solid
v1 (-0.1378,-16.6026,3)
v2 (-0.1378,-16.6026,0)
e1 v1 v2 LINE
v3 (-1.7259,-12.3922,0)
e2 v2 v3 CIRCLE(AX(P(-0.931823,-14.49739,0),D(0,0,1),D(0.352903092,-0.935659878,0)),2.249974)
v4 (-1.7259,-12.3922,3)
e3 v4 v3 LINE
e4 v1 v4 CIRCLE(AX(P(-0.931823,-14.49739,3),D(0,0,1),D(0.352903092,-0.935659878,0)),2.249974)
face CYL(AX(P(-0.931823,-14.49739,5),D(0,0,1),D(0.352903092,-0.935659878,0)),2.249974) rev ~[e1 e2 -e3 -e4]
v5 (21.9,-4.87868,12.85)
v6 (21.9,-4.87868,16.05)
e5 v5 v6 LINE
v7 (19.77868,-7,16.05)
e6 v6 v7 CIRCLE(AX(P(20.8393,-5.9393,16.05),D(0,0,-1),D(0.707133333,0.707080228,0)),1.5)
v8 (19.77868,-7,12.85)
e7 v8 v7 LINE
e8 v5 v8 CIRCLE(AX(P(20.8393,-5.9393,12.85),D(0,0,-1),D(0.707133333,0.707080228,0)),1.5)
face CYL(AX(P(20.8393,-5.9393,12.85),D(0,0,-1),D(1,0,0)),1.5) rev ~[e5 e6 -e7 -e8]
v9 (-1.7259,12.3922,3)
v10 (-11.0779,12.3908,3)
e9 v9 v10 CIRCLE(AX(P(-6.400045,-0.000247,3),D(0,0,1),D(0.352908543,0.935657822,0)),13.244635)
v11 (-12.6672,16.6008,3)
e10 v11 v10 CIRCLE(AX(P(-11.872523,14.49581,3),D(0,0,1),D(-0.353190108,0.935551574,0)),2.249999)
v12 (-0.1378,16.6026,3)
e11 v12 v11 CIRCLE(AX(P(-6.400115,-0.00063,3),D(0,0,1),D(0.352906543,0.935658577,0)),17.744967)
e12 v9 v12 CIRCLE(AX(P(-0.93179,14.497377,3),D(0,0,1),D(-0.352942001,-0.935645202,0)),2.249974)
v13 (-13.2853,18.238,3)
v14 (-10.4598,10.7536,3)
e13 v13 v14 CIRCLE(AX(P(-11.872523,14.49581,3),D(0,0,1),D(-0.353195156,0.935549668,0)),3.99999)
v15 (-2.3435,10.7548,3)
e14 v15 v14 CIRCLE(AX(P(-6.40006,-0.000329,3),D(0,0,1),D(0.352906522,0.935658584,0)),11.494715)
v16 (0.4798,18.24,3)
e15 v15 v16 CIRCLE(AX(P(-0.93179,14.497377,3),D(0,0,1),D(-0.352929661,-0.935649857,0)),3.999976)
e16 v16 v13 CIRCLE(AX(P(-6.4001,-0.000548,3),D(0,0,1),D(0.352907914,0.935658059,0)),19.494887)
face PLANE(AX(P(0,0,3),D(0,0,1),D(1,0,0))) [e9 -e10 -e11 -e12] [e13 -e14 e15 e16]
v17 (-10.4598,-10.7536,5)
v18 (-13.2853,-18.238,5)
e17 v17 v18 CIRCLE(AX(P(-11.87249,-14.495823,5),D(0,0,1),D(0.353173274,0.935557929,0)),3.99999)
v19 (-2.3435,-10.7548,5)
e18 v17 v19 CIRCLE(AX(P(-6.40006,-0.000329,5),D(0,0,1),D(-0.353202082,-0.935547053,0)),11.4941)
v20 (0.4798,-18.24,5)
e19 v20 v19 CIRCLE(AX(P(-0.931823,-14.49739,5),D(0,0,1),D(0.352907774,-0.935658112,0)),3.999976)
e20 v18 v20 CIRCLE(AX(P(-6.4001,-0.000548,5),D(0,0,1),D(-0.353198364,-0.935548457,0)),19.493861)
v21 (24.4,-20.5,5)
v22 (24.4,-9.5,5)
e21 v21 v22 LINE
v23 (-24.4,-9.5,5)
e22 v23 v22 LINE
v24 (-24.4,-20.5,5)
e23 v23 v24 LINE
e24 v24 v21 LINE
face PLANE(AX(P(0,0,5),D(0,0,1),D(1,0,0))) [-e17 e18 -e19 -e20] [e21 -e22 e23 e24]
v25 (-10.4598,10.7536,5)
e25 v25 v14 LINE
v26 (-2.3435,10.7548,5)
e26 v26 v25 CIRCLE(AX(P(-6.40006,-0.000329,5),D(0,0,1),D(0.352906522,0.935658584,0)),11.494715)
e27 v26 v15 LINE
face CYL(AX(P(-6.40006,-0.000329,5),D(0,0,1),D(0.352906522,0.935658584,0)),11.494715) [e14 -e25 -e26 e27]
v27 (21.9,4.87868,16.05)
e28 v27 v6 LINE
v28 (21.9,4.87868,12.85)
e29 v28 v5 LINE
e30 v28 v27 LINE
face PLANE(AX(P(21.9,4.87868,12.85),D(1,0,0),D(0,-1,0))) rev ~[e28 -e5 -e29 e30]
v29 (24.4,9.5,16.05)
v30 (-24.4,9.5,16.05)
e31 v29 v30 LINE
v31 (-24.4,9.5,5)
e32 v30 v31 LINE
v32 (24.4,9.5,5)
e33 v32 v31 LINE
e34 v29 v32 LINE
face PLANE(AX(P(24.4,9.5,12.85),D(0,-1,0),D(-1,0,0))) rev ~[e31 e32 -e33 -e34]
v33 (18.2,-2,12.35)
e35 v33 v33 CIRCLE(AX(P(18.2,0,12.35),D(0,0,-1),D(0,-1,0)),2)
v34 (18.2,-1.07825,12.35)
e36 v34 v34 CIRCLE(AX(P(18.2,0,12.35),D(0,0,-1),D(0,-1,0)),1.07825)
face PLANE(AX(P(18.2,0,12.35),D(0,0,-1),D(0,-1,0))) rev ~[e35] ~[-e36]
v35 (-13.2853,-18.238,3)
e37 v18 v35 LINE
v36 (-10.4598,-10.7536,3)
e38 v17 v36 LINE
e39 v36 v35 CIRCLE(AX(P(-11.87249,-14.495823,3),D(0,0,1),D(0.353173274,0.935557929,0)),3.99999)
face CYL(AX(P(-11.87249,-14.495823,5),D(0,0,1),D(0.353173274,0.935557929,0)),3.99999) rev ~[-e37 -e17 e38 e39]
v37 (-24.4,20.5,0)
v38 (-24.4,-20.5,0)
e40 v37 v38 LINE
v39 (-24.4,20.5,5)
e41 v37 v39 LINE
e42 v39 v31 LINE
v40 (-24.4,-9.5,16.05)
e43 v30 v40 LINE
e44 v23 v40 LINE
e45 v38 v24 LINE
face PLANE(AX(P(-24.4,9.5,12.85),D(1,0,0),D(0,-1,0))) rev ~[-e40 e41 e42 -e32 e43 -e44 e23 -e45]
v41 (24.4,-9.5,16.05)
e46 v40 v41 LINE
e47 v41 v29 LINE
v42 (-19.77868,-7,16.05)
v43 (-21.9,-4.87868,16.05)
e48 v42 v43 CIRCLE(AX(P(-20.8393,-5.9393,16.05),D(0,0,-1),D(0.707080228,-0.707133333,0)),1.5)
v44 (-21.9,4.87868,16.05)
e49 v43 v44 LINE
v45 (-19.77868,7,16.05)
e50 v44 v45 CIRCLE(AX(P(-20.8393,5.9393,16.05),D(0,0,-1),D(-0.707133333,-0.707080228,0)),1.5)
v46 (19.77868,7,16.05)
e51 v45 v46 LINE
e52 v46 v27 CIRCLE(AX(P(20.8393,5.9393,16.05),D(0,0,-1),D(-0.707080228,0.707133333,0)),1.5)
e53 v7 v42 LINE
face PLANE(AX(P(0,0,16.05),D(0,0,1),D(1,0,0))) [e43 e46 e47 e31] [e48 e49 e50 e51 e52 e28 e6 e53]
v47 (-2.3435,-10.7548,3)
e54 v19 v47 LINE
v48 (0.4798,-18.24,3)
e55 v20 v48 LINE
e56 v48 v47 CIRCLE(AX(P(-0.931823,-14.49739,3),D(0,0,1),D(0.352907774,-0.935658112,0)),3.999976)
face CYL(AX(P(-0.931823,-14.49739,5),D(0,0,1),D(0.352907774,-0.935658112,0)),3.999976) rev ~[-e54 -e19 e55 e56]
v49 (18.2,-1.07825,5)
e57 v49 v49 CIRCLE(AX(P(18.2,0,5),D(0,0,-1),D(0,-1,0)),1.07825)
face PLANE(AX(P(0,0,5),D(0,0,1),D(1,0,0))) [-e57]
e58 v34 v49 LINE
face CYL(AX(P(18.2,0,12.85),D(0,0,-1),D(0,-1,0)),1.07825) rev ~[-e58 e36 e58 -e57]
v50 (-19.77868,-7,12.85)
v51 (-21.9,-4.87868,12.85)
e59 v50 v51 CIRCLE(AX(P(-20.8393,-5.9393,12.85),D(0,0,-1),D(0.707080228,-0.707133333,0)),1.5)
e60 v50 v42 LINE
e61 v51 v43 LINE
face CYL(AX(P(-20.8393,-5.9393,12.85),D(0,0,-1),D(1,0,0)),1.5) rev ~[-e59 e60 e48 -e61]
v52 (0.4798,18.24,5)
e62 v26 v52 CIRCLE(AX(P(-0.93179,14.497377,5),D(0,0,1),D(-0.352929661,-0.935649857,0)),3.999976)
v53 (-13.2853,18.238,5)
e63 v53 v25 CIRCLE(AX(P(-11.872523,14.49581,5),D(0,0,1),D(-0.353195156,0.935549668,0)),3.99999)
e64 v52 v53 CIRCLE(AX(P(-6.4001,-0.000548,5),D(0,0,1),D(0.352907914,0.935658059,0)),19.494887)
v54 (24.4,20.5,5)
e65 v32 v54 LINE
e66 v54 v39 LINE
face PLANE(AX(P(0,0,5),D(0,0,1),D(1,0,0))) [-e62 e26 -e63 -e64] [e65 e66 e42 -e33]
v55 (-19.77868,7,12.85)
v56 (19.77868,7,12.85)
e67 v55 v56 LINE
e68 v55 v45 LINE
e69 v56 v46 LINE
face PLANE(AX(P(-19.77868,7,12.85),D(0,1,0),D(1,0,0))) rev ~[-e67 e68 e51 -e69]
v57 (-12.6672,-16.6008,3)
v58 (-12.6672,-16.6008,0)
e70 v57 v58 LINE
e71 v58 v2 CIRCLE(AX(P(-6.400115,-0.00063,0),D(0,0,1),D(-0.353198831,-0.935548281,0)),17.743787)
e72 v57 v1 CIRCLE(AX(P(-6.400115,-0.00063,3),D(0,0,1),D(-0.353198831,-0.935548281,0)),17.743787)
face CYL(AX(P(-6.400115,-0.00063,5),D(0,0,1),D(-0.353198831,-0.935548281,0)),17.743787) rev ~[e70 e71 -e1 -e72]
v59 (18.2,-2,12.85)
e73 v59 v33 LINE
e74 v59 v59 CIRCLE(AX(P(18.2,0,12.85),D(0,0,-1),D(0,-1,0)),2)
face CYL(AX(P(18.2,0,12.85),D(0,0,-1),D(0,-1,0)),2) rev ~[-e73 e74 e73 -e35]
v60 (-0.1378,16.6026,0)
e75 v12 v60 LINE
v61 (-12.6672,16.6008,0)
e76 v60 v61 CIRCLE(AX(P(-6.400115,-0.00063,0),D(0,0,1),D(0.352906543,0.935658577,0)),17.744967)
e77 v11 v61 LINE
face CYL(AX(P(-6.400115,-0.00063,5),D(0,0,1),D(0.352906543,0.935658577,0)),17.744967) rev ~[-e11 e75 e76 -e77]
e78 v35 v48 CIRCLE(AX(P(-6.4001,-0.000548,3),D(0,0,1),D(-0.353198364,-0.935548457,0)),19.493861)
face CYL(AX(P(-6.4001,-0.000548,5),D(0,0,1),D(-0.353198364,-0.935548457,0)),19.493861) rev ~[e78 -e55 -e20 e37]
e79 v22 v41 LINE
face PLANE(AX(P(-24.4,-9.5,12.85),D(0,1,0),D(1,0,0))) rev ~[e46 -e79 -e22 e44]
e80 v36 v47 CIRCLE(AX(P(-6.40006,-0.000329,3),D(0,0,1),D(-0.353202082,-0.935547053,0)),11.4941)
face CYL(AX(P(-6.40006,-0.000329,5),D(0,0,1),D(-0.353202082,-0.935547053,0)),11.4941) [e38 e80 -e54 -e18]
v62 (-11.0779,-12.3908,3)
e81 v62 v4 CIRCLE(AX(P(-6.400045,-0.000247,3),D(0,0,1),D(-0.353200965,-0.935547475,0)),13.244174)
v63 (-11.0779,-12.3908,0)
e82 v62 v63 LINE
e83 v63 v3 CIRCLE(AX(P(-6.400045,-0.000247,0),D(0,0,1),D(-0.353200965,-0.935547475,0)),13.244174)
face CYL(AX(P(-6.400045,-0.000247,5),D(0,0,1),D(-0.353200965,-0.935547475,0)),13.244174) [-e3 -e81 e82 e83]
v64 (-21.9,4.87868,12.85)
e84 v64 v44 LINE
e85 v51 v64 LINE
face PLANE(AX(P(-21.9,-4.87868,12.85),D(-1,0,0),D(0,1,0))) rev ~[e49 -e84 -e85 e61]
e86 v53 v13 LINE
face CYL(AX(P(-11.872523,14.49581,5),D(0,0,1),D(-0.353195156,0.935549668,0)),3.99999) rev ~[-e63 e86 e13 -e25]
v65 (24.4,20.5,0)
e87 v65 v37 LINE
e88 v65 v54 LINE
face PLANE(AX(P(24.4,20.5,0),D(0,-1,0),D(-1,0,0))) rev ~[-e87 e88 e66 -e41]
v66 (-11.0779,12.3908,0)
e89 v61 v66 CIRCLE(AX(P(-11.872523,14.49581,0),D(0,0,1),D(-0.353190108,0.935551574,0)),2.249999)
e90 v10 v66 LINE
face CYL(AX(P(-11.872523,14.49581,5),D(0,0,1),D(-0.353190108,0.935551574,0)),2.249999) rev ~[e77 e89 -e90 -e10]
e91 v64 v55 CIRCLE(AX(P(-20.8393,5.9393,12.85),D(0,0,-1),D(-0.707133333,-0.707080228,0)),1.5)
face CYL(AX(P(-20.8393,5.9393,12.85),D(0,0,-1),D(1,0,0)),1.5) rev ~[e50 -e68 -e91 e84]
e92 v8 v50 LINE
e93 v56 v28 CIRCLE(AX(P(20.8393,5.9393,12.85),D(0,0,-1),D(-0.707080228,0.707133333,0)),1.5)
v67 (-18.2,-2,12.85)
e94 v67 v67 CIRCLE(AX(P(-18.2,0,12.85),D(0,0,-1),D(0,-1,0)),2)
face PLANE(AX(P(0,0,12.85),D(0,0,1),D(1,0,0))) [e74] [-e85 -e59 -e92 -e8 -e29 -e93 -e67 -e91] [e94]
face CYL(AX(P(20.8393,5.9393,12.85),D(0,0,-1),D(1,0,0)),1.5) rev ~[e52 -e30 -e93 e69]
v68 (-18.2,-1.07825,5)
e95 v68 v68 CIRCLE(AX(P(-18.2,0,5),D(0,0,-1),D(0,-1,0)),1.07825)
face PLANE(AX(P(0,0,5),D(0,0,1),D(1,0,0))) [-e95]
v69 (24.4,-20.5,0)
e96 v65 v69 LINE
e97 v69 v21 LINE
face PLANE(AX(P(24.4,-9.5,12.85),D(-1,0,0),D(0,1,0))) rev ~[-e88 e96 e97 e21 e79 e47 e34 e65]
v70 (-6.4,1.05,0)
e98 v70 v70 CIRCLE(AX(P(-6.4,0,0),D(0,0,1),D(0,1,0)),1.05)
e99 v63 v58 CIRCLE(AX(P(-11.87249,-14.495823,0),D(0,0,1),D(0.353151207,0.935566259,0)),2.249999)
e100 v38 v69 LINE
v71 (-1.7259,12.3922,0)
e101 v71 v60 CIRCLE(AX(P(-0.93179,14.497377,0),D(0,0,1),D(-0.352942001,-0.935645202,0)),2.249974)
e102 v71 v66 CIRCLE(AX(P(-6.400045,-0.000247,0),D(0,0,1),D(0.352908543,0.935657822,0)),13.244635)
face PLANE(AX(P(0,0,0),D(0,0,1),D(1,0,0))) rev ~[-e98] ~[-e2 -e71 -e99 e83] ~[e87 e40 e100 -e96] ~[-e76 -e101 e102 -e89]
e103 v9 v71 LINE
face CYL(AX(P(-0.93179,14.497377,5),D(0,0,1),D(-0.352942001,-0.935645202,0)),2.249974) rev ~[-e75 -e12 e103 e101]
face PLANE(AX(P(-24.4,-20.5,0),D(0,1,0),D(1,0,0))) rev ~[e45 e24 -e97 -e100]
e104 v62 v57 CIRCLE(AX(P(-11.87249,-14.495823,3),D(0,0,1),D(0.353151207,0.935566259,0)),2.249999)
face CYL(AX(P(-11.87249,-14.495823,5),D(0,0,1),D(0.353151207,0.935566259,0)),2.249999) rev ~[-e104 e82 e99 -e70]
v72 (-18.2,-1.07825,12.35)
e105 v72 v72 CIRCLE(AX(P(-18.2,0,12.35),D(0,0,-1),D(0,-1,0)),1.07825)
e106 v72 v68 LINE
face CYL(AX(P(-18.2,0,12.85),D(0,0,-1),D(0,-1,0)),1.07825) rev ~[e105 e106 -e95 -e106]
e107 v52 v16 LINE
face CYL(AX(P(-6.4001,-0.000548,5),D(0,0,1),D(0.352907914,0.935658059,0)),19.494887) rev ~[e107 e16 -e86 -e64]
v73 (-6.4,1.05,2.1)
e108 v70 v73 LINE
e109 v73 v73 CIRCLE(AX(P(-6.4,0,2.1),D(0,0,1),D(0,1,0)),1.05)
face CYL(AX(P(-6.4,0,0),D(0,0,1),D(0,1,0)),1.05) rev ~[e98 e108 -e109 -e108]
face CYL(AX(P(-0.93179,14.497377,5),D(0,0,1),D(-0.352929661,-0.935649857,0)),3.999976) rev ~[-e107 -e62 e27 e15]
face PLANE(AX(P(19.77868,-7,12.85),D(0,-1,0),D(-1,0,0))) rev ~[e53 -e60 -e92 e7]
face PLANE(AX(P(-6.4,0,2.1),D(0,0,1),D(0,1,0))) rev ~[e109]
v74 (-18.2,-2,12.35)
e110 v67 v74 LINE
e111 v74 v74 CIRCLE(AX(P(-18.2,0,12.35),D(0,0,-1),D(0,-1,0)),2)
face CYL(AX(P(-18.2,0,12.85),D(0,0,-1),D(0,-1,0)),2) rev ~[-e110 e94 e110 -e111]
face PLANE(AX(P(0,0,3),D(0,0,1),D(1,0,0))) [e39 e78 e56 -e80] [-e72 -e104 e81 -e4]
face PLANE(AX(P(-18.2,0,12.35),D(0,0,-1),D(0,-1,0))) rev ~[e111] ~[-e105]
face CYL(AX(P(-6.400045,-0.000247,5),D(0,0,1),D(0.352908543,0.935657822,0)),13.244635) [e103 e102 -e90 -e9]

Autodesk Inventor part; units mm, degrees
ref_plane "YZ Plane" through (0, 0, 0) normal (1, 0, 0) x (0, 1, 0)
ref_plane "XZ Plane" through (0, 0, 0) normal (0, 1, 0) x (-1, 0, 0)
ref_plane "XY Plane" through (0, 0, 0) normal (0, 0, 1) x (1, 0, 0)
sketch "Sketch1" plane through (0, 0, 0) normal (0, 0, 1) x (1, 0, 0)
  line L0 (-24.4, -9.5) -> (24.4, -9.5)
  line L1 (24.4, -9.5) -> (24.4, 9.5)
  line L2 (24.4, 9.5) -> (-24.4, 9.5)
  line L3 (-24.4, 9.5) -> (-24.4, -9.5)
  line L4 (-24.4, -9.5) -> (24.4, 9.5) construction
  line L5 (24.4, -9.5) -> (-24.4, 9.5) construction
  point P0 (0, 0)
  dimension "LENGTH" = 48.8
  dimension "WIDTH" = 19
extrude "Extrusion1" add sketch "Sketch1" along normal blind 12.85
sketch "Sketch2" plane through (0, 0, 12.85) normal (0, 0, 1) x (1, 0, 0)
  point P0 (0, 0)
  point P1 (-18.2, 0)
  point P2 (18.2, 0)
  dimension "d11" = 0
  dimension "d12" = 0
  dimension "d13" = 36.4
  dimension "d14" = 18.2
hole "Hole1" at (-18.2, 0, 12.85) at (18.2, 0, 12.85) direction (0, 0, -1) diameter 2.1565 depth 8.87 thread size "4-40 UNC" class "2B" standard "ANSI Unified Screw Threads"
sketch "Sketch3" plane through (0, 0, 12.85) normal (0, 0, 1) x (1, 0, 0)
  point P0 (0, 0)
  point P1 (0, 0)
  dimension "d22" = 0
  dimension "d23" = 0
hole "Hole2" [suppressed]
sketch "Sketch4" plane through (0, 0, 0) normal (0, 0, -1) x (-1, 0, 0)
  line L0 (5.5, 0) -> (4.5, 0) construction
  line L1 (5.5, 1.05) -> (4.5, 1.05)
  line L2 (4.5, -1.05) -> (5.5, -1.05)
  arc A0 (5.5, -1.05) -> (5.5, 1.05) centre (5.5, 0) ccw
  arc A1 (4.5, 1.05) -> (4.5, -1.05) centre (4.5, 0) ccw
  point P0 (0, 0)
  point P1 (-5, 0)
  point P2 (5, 0)
  dimension "d24" = 1
  dimension "d25" = 0
  dimension "d26" = 0
  dimension "d27" = 10
  dimension "d28" = 5
  dimension "d29" = 1.05
hole "Hole3" [suppressed]
extrude "Extrusion2" [suppressed]
sketch "Sketch5" plane through (0, 0, 0) normal (0, 0, 1) x (1, 0, 0)
  line L0 (-24.4, -20.5) -> (24.4, -20.5)
  line L1 (24.4, -20.5) -> (24.4, 20.5)
  line L2 (24.4, 20.5) -> (-24.4, 20.5)
  line L3 (-24.4, 20.5) -> (-24.4, -20.5)
  line L4 (-24.4, -20.5) -> (24.4, 20.5) construction
  line L5 (24.4, -20.5) -> (-24.4, 20.5) construction
  point P0 (0, 0)
  dimension "d39" = 48.8
  dimension "d40" = 41
extrude "Extrusion3" add sketch "Sketch5" along normal blind 5
sketch "Sketch7" plane through (0, 0, 12.85) normal (0, 0, 1) x (1, 0, 0)
  circle A0 centre (18.2, 0) radius 1.0782 projected
  circle A1 centre (-18.2, 0) radius 1.0782 projected
  point P0 (0, 0)
  dimension "d54" = 0
  dimension "d55" = 0
  dimension "d56" = 0
  dimension "d57" = 0
hole "Hole5" at (18.2, 0, 12.85) at (-18.2, 0, 12.85) direction (0, 0, -1) diameter 4 depth 0.5
sketch "Sketch8" plane through (0, 0, 0) normal (0, 0, -1) x (-1, 0, 0)
  line L0 (0, 5.5) -> (0, 4.5) construction
  line L1 (-1.05, 5.5) -> (-1.05, 4.5)
  line L2 (1.05, 4.5) -> (1.05, 5.5)
  arc A0 (1.05, 5.5) -> (-1.05, 5.5) centre (0, 5.5) ccw
  arc A1 (-1.05, 4.5) -> (1.05, 4.5) centre (0, 4.5) ccw
  point P0 (0, 0)
  point P1 (0, -5)
  point P2 (0, 5)
  dimension "d77" = 1
  dimension "d78" = 1.05
  dimension "d79" = 10
  dimension "d80" = 0
  dimension "d81" = 0
  dimension "d82" = 5
hole "Hole6" [suppressed]
extrude "Extrusion4" [suppressed]
sketch "Sketch10" plane through (0, 0, 12.85) normal (0, 0, 1) x (1, 0, 0)
  line L0 (-24.4, -9.5) -> (24.4, -9.5)
  line L1 (24.4, -9.5) -> (24.4, 9.5)
  line L2 (24.4, 9.5) -> (-24.4, 9.5)
  line L3 (-24.4, 9.5) -> (-24.4, -9.5)
  line L4 (-24.4, -9.5) -> (24.4, 9.5) construction
  line L5 (24.4, -9.5) -> (-24.4, 9.5) construction
  line L6 (21.9, -7) -> (-21.9, -7)
  line L7 (-21.9, -7) -> (-21.9, 7)
  line L8 (-21.9, 7) -> (21.9, 7)
  line L9 (21.9, 7) -> (21.9, -7)
  line L10 (21.9, -7) -> (-21.9, 7) construction
  line L11 (-21.9, -7) -> (21.9, 7) construction
  circle A0 centre (-20.8393, 5.9393) radius 1.5
  circle A1 centre (-20.8393, -5.9393) radius 1.5
  circle A2 centre (20.8393, 5.9393) radius 1.5
  circle A3 centre (20.8393, -5.9393) radius 1.5
  line L12 (20.8393, 5.9393) -> (21.9, 7)
  line L13 (21.9, -7) -> (20.8393, -5.9393)
  line L14 (-20.8393, 5.9393) -> (-21.9, 7)
  line L15 (-20.8393, -5.9393) -> (-21.9, -7)
  point P0 (0, 0)
  point P1 (21.9, -4.8787)
  point P2 (19.7787, -7)
  point P3 (-19.7787, -7)
  point P4 (-21.9, -4.8787)
  point P5 (-21.9, 4.8787)
  point P6 (-19.7787, 7)
  point P7 (19.7787, 7)
  point P8 (21.9, 4.8787)
  dimension "d106" = 3
  dimension "d110" = 3
  dimension "d111" = 3
  dimension "d112" = 3
  dimension "d97" = 48.8
  dimension "d98" = 19
  dimension "d99" = 43.8
  dimension "d100" = 14
  dimension "d107" = 45
  dimension "d108" = 45
  dimension "d109" = 45
extrude "Extrusion6" add sketch "Sketch10" along normal blind 3.2
chamfer "Chamfer5" [suppressed]
sketch "Sketch12" plane through (0, 0, 5) normal (0, 0, 1) x (1, 0, 0)
  arc A0 (7.9961, 15.4962) -> (-8.004, 14.5013) centre (9.4196, -136.543) ccw construction
  arc A1 (7.9587, 19.496) -> (-8.4624, 18.4749) centre (9.4196, -136.543) ccw
  arc A2 (8.0336, 11.4964) -> (-7.5457, 10.5276) centre (9.4196, -136.543) ccw
  arc A3 (8.0336, 11.4964) -> (7.9587, 19.496) centre (7.9961, 15.4962) ccw
  arc A4 (-8.4624, 18.4749) -> (-7.5457, 10.5276) centre (-8.004, 14.5013) ccw
  line L0 (24.4, 2.961) -> (24.4, -2.961)
  line L1 (24.4, 0) -> (-24.4, 0)
  line L2 (-24.4, 8.5) -> (-24.4, -8.5)
  arc A5 (7.9961, 15.4962) -> (-8.004, 14.5013) centre (9.4196, -136.543) ccw construction
  arc A6 (7.9751, 17.7461) -> (-8.2619, 16.7364) centre (9.4196, -136.543) ccw
  arc A7 (8.0172, 13.2463) -> (-7.7462, 12.2661) centre (9.4196, -136.543) ccw
  arc A8 (8.0172, 13.2463) -> (7.9751, 17.7461) centre (7.9961, 15.4962) ccw
  arc A9 (-8.2619, 16.7364) -> (-7.7462, 12.2661) centre (-8.004, 14.5013) ccw
  arc A10 (-8.004, -14.5013) -> (7.9961, -15.4962) centre (9.4196, 136.543) ccw construction
  arc A11 (-8.4624, -18.4749) -> (7.9587, -19.496) centre (9.4196, 136.543) ccw
  arc A12 (-7.5457, -10.5276) -> (8.0336, -11.4964) centre (9.4196, 136.543) ccw
  arc A13 (7.9587, -19.496) -> (8.0336, -11.4964) centre (7.9961, -15.4962) ccw
  arc A14 (-7.5457, -10.5276) -> (-8.4624, -18.4749) centre (-8.004, -14.5013) ccw
  arc A15 (-8.004, -14.5013) -> (7.9961, -15.4962) centre (9.4196, 136.543) ccw construction
  arc A16 (-8.2619, -16.7364) -> (7.9751, -17.7461) centre (9.4196, 136.543) ccw
  arc A17 (-7.7462, -12.2661) -> (8.0172, -13.2463) centre (9.4196, 136.543) ccw
  arc A18 (7.9751, -17.7461) -> (8.0172, -13.2463) centre (7.9961, -15.4962) ccw
  arc A19 (-7.7462, -12.2661) -> (-8.2619, -16.7364) centre (-8.004, -14.5013) ccw
  point P0 (0, 0)
  point P1 (-8.004, 12.753)
  point P2 (7.9961, 17.2527)
  point P3 (-6.4165, 14.3405)
  point P4 (9.5836, 18.8402)
  point P5 (-8.004, -12.753)
  point P6 (7.9961, -17.2527)
  point P7 (9.5836, -18.8402)
  point P8 (-6.4165, -14.3405)
  dimension "d118" = 8
  dimension "d122" = 4.5
extrude "Extrusion12" [suppressed]
extrude "Extrusion13" [suppressed]
sketch "Sketch14" plane through (0, 0, 0) normal (0, 0, -1) x (-1, 0, 0)
  point P0 (0, 0)
  point P1 (6.4, 0)
hole "Hole7" at (-6.4, 0, 0) direction (0, 0, 1) diameter 2.1 depth 2.1
sketch "Sketch15" plane through (0, 0, 0) normal (0, 0, -1) x (-1, 0, 0)
  circle A0 centre (6.4, 0) radius 1.05 projected
  circle A1 centre (6.4, 0) radius 19.5
  circle A2 centre (6.4, 0) radius 11.5
  circle A3 centre (6.4, 0) radius 17.75
  circle A4 centre (6.4, 0) radius 13.25
  line L0 (-24.4, 9.5) -> (24.4, 9.5) projected
  line L1 (24.4, 9.5) -> (-24.4, 9.5)
  line L2 (-24.4, -20.5) -> (-24.4, 20.5) projected
  line L3 (24.4, -9.5) -> (-24.4, -9.5) projected
  line L4 (24.4, -9.5) -> (-24.4, -9.5)
  arc A5 (9.3371, 17.5053) -> (5.1369, 17.705) centre (6.4, 0) ccw
  arc A6 (8.5925, 13.0673) -> (5.4572, 13.2164) centre (6.4, 0) ccw
  arc A7 (13.9857, 17.9641) -> (-1.4292, 17.8592) centre (6.4, 0) ccw
  arc A8 (10.8736, 10.5942) -> (1.7828, 10.5324) centre (6.4, 0) ccw
  arc A9 (11.8707, 14.5025) -> (0.9294, 14.5025) centre (6.4, 0) ccw construction
  arc A10 (13.2825, 18.2451) -> (-0.4824, 18.2451) centre (6.4, 0) ccw
  arc A11 (10.4589, 10.7599) -> (2.3412, 10.7599) centre (6.4, 0) ccw
  arc A12 (10.4589, 10.7599) -> (13.2825, 18.2451) centre (11.8707, 14.5025) ccw
  arc A13 (-0.4824, 18.2451) -> (2.3412, 10.7599) centre (0.9294, 14.5025) ccw
  arc A14 (11.8707, 14.5025) -> (0.9294, 14.5025) centre (6.4, 0) ccw construction
  arc A15 (12.6648, 16.6077) -> (0.1352, 16.6077) centre (6.4, 0) ccw
  arc A16 (11.0766, 12.3973) -> (1.7235, 12.3973) centre (6.4, 0) ccw
  arc A17 (11.0766, 12.3973) -> (12.6648, 16.6077) centre (11.8707, 14.5025) ccw
  arc A18 (0.1352, 16.6077) -> (1.7235, 12.3973) centre (0.9294, 14.5025) ccw
  line L5 (24.4, 9.5) -> (24.4, -9.5) projected
  line L6 (24.4, 0) -> (-24.4, 0)
  arc A19 (5.1369, -17.705) -> (9.3371, -17.5053) centre (6.4, 0) ccw
  arc A20 (5.4572, -13.2164) -> (8.5925, -13.0673) centre (6.4, 0) ccw
  arc A21 (-1.4292, -17.8592) -> (13.9857, -17.9641) centre (6.4, 0) ccw
  arc A22 (1.7828, -10.5324) -> (10.8736, -10.5942) centre (6.4, 0) ccw
  arc A23 (0.9294, -14.5025) -> (11.8707, -14.5025) centre (6.4, 0) ccw construction
  arc A24 (-0.4824, -18.2451) -> (13.2825, -18.2451) centre (6.4, 0) ccw
  arc A25 (2.3412, -10.7599) -> (10.4589, -10.7599) centre (6.4, 0) ccw
  arc A26 (13.2825, -18.2451) -> (10.4589, -10.7599) centre (11.8707, -14.5025) ccw
  arc A27 (2.3412, -10.7599) -> (-0.4824, -18.2451) centre (0.9294, -14.5025) ccw
  arc A28 (0.9294, -14.5025) -> (11.8707, -14.5025) centre (6.4, 0) ccw construction
  arc A29 (0.1352, -16.6077) -> (12.6648, -16.6077) centre (6.4, 0) ccw
  arc A30 (1.7235, -12.3973) -> (11.0766, -12.3973) centre (6.4, 0) ccw
  arc A31 (12.6648, -16.6077) -> (11.0766, -12.3973) centre (11.8707, -14.5025) ccw
  arc A32 (1.7235, -12.3973) -> (0.1352, -16.6077) centre (0.9294, -14.5025) ccw
  point P0 (0, 0)
  point P1 (-24.4, -19.5)
  point P2 (-24.4, 19.5)
  point P3 (24.4, 8.5)
  point P4 (24.4, -8.5)
  point P5 (6.4, 15.5)
  point P6 (6.4, -15.5)
  dimension "d140" = 39
  dimension "d141" = 23
  dimension "d142" = 35.5
  dimension "d143" = 26.5
  dimension "d147" = 8
  dimension "d148" = 4.5
sketch "Sketch17" plane through (0, 0, 5) normal (0, 0, 1) x (1, 0, 0)
  circle A0 centre (-6.4, 0) radius 1.05 projected
  arc A1 (-11.8725, -14.4958) -> (-0.9318, -14.4974) centre (-6.4, 0) ccw construction
  arc A2 (-12.6672, -16.6008) -> (-0.1378, -16.6026) centre (-6.4, 0) ccw
  arc A3 (-11.0779, -12.3908) -> (-1.7259, -12.3922) centre (-6.4, 0) ccw
  arc A4 (-11.0779, -12.3908) -> (-12.6672, -16.6008) centre (-11.8725, -14.4958) ccw
  arc A5 (-0.1378, -16.6026) -> (-1.7259, -12.3922) centre (-0.9318, -14.4974) ccw
  arc A6 (-11.8725, -14.4958) -> (-0.9318, -14.4974) centre (-6.4, 0) ccw construction
  arc A7 (-13.2853, -18.238) -> (0.4798, -18.24) centre (-6.4, 0) ccw
  arc A8 (-10.4598, -10.7536) -> (-2.3435, -10.7548) centre (-6.4, 0) ccw
  arc A9 (-10.4598, -10.7536) -> (-13.2853, -18.238) centre (-11.8725, -14.4958) ccw
  arc A10 (0.4798, -18.24) -> (-2.3435, -10.7548) centre (-0.9318, -14.4974) ccw
  line L0 (-24.1444, 0) -> (24.3913, 0)
  line L1 (24.3913, 0) -> (-24.1444, 0)
  arc A11 (-0.9318, 14.4974) -> (-11.8725, 14.4958) centre (-6.4, 0) ccw construction
  arc A12 (-0.1378, 16.6026) -> (-12.6672, 16.6008) centre (-6.4, 0) ccw
  arc A13 (-1.7259, 12.3922) -> (-11.0779, 12.3908) centre (-6.4, 0) ccw
  arc A14 (-12.6672, 16.6008) -> (-11.0779, 12.3908) centre (-11.8725, 14.4958) ccw
  arc A15 (-1.7259, 12.3922) -> (-0.1378, 16.6026) centre (-0.9318, 14.4974) ccw
  arc A16 (-0.9318, 14.4974) -> (-11.8725, 14.4958) centre (-6.4, 0) ccw construction
  arc A17 (0.4798, 18.24) -> (-13.2853, 18.238) centre (-6.4, 0) ccw
  arc A18 (-2.3435, 10.7548) -> (-10.4598, 10.7536) centre (-6.4, 0) ccw
  arc A19 (-13.2853, 18.238) -> (-10.4598, 10.7536) centre (-11.8725, 14.4958) ccw
  arc A20 (-2.3435, 10.7548) -> (0.4798, 18.24) centre (-0.9318, 14.4974) ccw
  point P0 (0, 0)
  point P1 (-0.9324, -14.4958)
  point P2 (-0.9324, 14.4958)
  dimension "d149" = 4.5
  dimension "d150" = 8
extrude "Extrusion14" cut sketch "Sketch17" against normal through all contours A4 A3 A5 A2 | A15 A13 A14 A12
extrude "Extrusion15" cut sketch "Sketch17" against normal blind 2 contours A9 A8 A10 A7 | A20 A18 A19 A17
equation "\"d2\" = BEAM_HEIGHT - APERTURE_HEIGHT"
equation "\"d14\" = 0.5 * d13"
equation "\"d39\" = LENGTH"
equation "\"d106\" = d110"
equation "\"d111\" = d110"
equation "\"d112\" = d110"
equation "\"d97\" = LENGTH"
equation "\"d98\" = WIDTH"
equation "\"BEAM_HEIGHT\" = 19.05"
equation "\"APERTURE_HEIGHT\" = 6.2"
properties part number "ADAPTER_AOM-brimrose"
